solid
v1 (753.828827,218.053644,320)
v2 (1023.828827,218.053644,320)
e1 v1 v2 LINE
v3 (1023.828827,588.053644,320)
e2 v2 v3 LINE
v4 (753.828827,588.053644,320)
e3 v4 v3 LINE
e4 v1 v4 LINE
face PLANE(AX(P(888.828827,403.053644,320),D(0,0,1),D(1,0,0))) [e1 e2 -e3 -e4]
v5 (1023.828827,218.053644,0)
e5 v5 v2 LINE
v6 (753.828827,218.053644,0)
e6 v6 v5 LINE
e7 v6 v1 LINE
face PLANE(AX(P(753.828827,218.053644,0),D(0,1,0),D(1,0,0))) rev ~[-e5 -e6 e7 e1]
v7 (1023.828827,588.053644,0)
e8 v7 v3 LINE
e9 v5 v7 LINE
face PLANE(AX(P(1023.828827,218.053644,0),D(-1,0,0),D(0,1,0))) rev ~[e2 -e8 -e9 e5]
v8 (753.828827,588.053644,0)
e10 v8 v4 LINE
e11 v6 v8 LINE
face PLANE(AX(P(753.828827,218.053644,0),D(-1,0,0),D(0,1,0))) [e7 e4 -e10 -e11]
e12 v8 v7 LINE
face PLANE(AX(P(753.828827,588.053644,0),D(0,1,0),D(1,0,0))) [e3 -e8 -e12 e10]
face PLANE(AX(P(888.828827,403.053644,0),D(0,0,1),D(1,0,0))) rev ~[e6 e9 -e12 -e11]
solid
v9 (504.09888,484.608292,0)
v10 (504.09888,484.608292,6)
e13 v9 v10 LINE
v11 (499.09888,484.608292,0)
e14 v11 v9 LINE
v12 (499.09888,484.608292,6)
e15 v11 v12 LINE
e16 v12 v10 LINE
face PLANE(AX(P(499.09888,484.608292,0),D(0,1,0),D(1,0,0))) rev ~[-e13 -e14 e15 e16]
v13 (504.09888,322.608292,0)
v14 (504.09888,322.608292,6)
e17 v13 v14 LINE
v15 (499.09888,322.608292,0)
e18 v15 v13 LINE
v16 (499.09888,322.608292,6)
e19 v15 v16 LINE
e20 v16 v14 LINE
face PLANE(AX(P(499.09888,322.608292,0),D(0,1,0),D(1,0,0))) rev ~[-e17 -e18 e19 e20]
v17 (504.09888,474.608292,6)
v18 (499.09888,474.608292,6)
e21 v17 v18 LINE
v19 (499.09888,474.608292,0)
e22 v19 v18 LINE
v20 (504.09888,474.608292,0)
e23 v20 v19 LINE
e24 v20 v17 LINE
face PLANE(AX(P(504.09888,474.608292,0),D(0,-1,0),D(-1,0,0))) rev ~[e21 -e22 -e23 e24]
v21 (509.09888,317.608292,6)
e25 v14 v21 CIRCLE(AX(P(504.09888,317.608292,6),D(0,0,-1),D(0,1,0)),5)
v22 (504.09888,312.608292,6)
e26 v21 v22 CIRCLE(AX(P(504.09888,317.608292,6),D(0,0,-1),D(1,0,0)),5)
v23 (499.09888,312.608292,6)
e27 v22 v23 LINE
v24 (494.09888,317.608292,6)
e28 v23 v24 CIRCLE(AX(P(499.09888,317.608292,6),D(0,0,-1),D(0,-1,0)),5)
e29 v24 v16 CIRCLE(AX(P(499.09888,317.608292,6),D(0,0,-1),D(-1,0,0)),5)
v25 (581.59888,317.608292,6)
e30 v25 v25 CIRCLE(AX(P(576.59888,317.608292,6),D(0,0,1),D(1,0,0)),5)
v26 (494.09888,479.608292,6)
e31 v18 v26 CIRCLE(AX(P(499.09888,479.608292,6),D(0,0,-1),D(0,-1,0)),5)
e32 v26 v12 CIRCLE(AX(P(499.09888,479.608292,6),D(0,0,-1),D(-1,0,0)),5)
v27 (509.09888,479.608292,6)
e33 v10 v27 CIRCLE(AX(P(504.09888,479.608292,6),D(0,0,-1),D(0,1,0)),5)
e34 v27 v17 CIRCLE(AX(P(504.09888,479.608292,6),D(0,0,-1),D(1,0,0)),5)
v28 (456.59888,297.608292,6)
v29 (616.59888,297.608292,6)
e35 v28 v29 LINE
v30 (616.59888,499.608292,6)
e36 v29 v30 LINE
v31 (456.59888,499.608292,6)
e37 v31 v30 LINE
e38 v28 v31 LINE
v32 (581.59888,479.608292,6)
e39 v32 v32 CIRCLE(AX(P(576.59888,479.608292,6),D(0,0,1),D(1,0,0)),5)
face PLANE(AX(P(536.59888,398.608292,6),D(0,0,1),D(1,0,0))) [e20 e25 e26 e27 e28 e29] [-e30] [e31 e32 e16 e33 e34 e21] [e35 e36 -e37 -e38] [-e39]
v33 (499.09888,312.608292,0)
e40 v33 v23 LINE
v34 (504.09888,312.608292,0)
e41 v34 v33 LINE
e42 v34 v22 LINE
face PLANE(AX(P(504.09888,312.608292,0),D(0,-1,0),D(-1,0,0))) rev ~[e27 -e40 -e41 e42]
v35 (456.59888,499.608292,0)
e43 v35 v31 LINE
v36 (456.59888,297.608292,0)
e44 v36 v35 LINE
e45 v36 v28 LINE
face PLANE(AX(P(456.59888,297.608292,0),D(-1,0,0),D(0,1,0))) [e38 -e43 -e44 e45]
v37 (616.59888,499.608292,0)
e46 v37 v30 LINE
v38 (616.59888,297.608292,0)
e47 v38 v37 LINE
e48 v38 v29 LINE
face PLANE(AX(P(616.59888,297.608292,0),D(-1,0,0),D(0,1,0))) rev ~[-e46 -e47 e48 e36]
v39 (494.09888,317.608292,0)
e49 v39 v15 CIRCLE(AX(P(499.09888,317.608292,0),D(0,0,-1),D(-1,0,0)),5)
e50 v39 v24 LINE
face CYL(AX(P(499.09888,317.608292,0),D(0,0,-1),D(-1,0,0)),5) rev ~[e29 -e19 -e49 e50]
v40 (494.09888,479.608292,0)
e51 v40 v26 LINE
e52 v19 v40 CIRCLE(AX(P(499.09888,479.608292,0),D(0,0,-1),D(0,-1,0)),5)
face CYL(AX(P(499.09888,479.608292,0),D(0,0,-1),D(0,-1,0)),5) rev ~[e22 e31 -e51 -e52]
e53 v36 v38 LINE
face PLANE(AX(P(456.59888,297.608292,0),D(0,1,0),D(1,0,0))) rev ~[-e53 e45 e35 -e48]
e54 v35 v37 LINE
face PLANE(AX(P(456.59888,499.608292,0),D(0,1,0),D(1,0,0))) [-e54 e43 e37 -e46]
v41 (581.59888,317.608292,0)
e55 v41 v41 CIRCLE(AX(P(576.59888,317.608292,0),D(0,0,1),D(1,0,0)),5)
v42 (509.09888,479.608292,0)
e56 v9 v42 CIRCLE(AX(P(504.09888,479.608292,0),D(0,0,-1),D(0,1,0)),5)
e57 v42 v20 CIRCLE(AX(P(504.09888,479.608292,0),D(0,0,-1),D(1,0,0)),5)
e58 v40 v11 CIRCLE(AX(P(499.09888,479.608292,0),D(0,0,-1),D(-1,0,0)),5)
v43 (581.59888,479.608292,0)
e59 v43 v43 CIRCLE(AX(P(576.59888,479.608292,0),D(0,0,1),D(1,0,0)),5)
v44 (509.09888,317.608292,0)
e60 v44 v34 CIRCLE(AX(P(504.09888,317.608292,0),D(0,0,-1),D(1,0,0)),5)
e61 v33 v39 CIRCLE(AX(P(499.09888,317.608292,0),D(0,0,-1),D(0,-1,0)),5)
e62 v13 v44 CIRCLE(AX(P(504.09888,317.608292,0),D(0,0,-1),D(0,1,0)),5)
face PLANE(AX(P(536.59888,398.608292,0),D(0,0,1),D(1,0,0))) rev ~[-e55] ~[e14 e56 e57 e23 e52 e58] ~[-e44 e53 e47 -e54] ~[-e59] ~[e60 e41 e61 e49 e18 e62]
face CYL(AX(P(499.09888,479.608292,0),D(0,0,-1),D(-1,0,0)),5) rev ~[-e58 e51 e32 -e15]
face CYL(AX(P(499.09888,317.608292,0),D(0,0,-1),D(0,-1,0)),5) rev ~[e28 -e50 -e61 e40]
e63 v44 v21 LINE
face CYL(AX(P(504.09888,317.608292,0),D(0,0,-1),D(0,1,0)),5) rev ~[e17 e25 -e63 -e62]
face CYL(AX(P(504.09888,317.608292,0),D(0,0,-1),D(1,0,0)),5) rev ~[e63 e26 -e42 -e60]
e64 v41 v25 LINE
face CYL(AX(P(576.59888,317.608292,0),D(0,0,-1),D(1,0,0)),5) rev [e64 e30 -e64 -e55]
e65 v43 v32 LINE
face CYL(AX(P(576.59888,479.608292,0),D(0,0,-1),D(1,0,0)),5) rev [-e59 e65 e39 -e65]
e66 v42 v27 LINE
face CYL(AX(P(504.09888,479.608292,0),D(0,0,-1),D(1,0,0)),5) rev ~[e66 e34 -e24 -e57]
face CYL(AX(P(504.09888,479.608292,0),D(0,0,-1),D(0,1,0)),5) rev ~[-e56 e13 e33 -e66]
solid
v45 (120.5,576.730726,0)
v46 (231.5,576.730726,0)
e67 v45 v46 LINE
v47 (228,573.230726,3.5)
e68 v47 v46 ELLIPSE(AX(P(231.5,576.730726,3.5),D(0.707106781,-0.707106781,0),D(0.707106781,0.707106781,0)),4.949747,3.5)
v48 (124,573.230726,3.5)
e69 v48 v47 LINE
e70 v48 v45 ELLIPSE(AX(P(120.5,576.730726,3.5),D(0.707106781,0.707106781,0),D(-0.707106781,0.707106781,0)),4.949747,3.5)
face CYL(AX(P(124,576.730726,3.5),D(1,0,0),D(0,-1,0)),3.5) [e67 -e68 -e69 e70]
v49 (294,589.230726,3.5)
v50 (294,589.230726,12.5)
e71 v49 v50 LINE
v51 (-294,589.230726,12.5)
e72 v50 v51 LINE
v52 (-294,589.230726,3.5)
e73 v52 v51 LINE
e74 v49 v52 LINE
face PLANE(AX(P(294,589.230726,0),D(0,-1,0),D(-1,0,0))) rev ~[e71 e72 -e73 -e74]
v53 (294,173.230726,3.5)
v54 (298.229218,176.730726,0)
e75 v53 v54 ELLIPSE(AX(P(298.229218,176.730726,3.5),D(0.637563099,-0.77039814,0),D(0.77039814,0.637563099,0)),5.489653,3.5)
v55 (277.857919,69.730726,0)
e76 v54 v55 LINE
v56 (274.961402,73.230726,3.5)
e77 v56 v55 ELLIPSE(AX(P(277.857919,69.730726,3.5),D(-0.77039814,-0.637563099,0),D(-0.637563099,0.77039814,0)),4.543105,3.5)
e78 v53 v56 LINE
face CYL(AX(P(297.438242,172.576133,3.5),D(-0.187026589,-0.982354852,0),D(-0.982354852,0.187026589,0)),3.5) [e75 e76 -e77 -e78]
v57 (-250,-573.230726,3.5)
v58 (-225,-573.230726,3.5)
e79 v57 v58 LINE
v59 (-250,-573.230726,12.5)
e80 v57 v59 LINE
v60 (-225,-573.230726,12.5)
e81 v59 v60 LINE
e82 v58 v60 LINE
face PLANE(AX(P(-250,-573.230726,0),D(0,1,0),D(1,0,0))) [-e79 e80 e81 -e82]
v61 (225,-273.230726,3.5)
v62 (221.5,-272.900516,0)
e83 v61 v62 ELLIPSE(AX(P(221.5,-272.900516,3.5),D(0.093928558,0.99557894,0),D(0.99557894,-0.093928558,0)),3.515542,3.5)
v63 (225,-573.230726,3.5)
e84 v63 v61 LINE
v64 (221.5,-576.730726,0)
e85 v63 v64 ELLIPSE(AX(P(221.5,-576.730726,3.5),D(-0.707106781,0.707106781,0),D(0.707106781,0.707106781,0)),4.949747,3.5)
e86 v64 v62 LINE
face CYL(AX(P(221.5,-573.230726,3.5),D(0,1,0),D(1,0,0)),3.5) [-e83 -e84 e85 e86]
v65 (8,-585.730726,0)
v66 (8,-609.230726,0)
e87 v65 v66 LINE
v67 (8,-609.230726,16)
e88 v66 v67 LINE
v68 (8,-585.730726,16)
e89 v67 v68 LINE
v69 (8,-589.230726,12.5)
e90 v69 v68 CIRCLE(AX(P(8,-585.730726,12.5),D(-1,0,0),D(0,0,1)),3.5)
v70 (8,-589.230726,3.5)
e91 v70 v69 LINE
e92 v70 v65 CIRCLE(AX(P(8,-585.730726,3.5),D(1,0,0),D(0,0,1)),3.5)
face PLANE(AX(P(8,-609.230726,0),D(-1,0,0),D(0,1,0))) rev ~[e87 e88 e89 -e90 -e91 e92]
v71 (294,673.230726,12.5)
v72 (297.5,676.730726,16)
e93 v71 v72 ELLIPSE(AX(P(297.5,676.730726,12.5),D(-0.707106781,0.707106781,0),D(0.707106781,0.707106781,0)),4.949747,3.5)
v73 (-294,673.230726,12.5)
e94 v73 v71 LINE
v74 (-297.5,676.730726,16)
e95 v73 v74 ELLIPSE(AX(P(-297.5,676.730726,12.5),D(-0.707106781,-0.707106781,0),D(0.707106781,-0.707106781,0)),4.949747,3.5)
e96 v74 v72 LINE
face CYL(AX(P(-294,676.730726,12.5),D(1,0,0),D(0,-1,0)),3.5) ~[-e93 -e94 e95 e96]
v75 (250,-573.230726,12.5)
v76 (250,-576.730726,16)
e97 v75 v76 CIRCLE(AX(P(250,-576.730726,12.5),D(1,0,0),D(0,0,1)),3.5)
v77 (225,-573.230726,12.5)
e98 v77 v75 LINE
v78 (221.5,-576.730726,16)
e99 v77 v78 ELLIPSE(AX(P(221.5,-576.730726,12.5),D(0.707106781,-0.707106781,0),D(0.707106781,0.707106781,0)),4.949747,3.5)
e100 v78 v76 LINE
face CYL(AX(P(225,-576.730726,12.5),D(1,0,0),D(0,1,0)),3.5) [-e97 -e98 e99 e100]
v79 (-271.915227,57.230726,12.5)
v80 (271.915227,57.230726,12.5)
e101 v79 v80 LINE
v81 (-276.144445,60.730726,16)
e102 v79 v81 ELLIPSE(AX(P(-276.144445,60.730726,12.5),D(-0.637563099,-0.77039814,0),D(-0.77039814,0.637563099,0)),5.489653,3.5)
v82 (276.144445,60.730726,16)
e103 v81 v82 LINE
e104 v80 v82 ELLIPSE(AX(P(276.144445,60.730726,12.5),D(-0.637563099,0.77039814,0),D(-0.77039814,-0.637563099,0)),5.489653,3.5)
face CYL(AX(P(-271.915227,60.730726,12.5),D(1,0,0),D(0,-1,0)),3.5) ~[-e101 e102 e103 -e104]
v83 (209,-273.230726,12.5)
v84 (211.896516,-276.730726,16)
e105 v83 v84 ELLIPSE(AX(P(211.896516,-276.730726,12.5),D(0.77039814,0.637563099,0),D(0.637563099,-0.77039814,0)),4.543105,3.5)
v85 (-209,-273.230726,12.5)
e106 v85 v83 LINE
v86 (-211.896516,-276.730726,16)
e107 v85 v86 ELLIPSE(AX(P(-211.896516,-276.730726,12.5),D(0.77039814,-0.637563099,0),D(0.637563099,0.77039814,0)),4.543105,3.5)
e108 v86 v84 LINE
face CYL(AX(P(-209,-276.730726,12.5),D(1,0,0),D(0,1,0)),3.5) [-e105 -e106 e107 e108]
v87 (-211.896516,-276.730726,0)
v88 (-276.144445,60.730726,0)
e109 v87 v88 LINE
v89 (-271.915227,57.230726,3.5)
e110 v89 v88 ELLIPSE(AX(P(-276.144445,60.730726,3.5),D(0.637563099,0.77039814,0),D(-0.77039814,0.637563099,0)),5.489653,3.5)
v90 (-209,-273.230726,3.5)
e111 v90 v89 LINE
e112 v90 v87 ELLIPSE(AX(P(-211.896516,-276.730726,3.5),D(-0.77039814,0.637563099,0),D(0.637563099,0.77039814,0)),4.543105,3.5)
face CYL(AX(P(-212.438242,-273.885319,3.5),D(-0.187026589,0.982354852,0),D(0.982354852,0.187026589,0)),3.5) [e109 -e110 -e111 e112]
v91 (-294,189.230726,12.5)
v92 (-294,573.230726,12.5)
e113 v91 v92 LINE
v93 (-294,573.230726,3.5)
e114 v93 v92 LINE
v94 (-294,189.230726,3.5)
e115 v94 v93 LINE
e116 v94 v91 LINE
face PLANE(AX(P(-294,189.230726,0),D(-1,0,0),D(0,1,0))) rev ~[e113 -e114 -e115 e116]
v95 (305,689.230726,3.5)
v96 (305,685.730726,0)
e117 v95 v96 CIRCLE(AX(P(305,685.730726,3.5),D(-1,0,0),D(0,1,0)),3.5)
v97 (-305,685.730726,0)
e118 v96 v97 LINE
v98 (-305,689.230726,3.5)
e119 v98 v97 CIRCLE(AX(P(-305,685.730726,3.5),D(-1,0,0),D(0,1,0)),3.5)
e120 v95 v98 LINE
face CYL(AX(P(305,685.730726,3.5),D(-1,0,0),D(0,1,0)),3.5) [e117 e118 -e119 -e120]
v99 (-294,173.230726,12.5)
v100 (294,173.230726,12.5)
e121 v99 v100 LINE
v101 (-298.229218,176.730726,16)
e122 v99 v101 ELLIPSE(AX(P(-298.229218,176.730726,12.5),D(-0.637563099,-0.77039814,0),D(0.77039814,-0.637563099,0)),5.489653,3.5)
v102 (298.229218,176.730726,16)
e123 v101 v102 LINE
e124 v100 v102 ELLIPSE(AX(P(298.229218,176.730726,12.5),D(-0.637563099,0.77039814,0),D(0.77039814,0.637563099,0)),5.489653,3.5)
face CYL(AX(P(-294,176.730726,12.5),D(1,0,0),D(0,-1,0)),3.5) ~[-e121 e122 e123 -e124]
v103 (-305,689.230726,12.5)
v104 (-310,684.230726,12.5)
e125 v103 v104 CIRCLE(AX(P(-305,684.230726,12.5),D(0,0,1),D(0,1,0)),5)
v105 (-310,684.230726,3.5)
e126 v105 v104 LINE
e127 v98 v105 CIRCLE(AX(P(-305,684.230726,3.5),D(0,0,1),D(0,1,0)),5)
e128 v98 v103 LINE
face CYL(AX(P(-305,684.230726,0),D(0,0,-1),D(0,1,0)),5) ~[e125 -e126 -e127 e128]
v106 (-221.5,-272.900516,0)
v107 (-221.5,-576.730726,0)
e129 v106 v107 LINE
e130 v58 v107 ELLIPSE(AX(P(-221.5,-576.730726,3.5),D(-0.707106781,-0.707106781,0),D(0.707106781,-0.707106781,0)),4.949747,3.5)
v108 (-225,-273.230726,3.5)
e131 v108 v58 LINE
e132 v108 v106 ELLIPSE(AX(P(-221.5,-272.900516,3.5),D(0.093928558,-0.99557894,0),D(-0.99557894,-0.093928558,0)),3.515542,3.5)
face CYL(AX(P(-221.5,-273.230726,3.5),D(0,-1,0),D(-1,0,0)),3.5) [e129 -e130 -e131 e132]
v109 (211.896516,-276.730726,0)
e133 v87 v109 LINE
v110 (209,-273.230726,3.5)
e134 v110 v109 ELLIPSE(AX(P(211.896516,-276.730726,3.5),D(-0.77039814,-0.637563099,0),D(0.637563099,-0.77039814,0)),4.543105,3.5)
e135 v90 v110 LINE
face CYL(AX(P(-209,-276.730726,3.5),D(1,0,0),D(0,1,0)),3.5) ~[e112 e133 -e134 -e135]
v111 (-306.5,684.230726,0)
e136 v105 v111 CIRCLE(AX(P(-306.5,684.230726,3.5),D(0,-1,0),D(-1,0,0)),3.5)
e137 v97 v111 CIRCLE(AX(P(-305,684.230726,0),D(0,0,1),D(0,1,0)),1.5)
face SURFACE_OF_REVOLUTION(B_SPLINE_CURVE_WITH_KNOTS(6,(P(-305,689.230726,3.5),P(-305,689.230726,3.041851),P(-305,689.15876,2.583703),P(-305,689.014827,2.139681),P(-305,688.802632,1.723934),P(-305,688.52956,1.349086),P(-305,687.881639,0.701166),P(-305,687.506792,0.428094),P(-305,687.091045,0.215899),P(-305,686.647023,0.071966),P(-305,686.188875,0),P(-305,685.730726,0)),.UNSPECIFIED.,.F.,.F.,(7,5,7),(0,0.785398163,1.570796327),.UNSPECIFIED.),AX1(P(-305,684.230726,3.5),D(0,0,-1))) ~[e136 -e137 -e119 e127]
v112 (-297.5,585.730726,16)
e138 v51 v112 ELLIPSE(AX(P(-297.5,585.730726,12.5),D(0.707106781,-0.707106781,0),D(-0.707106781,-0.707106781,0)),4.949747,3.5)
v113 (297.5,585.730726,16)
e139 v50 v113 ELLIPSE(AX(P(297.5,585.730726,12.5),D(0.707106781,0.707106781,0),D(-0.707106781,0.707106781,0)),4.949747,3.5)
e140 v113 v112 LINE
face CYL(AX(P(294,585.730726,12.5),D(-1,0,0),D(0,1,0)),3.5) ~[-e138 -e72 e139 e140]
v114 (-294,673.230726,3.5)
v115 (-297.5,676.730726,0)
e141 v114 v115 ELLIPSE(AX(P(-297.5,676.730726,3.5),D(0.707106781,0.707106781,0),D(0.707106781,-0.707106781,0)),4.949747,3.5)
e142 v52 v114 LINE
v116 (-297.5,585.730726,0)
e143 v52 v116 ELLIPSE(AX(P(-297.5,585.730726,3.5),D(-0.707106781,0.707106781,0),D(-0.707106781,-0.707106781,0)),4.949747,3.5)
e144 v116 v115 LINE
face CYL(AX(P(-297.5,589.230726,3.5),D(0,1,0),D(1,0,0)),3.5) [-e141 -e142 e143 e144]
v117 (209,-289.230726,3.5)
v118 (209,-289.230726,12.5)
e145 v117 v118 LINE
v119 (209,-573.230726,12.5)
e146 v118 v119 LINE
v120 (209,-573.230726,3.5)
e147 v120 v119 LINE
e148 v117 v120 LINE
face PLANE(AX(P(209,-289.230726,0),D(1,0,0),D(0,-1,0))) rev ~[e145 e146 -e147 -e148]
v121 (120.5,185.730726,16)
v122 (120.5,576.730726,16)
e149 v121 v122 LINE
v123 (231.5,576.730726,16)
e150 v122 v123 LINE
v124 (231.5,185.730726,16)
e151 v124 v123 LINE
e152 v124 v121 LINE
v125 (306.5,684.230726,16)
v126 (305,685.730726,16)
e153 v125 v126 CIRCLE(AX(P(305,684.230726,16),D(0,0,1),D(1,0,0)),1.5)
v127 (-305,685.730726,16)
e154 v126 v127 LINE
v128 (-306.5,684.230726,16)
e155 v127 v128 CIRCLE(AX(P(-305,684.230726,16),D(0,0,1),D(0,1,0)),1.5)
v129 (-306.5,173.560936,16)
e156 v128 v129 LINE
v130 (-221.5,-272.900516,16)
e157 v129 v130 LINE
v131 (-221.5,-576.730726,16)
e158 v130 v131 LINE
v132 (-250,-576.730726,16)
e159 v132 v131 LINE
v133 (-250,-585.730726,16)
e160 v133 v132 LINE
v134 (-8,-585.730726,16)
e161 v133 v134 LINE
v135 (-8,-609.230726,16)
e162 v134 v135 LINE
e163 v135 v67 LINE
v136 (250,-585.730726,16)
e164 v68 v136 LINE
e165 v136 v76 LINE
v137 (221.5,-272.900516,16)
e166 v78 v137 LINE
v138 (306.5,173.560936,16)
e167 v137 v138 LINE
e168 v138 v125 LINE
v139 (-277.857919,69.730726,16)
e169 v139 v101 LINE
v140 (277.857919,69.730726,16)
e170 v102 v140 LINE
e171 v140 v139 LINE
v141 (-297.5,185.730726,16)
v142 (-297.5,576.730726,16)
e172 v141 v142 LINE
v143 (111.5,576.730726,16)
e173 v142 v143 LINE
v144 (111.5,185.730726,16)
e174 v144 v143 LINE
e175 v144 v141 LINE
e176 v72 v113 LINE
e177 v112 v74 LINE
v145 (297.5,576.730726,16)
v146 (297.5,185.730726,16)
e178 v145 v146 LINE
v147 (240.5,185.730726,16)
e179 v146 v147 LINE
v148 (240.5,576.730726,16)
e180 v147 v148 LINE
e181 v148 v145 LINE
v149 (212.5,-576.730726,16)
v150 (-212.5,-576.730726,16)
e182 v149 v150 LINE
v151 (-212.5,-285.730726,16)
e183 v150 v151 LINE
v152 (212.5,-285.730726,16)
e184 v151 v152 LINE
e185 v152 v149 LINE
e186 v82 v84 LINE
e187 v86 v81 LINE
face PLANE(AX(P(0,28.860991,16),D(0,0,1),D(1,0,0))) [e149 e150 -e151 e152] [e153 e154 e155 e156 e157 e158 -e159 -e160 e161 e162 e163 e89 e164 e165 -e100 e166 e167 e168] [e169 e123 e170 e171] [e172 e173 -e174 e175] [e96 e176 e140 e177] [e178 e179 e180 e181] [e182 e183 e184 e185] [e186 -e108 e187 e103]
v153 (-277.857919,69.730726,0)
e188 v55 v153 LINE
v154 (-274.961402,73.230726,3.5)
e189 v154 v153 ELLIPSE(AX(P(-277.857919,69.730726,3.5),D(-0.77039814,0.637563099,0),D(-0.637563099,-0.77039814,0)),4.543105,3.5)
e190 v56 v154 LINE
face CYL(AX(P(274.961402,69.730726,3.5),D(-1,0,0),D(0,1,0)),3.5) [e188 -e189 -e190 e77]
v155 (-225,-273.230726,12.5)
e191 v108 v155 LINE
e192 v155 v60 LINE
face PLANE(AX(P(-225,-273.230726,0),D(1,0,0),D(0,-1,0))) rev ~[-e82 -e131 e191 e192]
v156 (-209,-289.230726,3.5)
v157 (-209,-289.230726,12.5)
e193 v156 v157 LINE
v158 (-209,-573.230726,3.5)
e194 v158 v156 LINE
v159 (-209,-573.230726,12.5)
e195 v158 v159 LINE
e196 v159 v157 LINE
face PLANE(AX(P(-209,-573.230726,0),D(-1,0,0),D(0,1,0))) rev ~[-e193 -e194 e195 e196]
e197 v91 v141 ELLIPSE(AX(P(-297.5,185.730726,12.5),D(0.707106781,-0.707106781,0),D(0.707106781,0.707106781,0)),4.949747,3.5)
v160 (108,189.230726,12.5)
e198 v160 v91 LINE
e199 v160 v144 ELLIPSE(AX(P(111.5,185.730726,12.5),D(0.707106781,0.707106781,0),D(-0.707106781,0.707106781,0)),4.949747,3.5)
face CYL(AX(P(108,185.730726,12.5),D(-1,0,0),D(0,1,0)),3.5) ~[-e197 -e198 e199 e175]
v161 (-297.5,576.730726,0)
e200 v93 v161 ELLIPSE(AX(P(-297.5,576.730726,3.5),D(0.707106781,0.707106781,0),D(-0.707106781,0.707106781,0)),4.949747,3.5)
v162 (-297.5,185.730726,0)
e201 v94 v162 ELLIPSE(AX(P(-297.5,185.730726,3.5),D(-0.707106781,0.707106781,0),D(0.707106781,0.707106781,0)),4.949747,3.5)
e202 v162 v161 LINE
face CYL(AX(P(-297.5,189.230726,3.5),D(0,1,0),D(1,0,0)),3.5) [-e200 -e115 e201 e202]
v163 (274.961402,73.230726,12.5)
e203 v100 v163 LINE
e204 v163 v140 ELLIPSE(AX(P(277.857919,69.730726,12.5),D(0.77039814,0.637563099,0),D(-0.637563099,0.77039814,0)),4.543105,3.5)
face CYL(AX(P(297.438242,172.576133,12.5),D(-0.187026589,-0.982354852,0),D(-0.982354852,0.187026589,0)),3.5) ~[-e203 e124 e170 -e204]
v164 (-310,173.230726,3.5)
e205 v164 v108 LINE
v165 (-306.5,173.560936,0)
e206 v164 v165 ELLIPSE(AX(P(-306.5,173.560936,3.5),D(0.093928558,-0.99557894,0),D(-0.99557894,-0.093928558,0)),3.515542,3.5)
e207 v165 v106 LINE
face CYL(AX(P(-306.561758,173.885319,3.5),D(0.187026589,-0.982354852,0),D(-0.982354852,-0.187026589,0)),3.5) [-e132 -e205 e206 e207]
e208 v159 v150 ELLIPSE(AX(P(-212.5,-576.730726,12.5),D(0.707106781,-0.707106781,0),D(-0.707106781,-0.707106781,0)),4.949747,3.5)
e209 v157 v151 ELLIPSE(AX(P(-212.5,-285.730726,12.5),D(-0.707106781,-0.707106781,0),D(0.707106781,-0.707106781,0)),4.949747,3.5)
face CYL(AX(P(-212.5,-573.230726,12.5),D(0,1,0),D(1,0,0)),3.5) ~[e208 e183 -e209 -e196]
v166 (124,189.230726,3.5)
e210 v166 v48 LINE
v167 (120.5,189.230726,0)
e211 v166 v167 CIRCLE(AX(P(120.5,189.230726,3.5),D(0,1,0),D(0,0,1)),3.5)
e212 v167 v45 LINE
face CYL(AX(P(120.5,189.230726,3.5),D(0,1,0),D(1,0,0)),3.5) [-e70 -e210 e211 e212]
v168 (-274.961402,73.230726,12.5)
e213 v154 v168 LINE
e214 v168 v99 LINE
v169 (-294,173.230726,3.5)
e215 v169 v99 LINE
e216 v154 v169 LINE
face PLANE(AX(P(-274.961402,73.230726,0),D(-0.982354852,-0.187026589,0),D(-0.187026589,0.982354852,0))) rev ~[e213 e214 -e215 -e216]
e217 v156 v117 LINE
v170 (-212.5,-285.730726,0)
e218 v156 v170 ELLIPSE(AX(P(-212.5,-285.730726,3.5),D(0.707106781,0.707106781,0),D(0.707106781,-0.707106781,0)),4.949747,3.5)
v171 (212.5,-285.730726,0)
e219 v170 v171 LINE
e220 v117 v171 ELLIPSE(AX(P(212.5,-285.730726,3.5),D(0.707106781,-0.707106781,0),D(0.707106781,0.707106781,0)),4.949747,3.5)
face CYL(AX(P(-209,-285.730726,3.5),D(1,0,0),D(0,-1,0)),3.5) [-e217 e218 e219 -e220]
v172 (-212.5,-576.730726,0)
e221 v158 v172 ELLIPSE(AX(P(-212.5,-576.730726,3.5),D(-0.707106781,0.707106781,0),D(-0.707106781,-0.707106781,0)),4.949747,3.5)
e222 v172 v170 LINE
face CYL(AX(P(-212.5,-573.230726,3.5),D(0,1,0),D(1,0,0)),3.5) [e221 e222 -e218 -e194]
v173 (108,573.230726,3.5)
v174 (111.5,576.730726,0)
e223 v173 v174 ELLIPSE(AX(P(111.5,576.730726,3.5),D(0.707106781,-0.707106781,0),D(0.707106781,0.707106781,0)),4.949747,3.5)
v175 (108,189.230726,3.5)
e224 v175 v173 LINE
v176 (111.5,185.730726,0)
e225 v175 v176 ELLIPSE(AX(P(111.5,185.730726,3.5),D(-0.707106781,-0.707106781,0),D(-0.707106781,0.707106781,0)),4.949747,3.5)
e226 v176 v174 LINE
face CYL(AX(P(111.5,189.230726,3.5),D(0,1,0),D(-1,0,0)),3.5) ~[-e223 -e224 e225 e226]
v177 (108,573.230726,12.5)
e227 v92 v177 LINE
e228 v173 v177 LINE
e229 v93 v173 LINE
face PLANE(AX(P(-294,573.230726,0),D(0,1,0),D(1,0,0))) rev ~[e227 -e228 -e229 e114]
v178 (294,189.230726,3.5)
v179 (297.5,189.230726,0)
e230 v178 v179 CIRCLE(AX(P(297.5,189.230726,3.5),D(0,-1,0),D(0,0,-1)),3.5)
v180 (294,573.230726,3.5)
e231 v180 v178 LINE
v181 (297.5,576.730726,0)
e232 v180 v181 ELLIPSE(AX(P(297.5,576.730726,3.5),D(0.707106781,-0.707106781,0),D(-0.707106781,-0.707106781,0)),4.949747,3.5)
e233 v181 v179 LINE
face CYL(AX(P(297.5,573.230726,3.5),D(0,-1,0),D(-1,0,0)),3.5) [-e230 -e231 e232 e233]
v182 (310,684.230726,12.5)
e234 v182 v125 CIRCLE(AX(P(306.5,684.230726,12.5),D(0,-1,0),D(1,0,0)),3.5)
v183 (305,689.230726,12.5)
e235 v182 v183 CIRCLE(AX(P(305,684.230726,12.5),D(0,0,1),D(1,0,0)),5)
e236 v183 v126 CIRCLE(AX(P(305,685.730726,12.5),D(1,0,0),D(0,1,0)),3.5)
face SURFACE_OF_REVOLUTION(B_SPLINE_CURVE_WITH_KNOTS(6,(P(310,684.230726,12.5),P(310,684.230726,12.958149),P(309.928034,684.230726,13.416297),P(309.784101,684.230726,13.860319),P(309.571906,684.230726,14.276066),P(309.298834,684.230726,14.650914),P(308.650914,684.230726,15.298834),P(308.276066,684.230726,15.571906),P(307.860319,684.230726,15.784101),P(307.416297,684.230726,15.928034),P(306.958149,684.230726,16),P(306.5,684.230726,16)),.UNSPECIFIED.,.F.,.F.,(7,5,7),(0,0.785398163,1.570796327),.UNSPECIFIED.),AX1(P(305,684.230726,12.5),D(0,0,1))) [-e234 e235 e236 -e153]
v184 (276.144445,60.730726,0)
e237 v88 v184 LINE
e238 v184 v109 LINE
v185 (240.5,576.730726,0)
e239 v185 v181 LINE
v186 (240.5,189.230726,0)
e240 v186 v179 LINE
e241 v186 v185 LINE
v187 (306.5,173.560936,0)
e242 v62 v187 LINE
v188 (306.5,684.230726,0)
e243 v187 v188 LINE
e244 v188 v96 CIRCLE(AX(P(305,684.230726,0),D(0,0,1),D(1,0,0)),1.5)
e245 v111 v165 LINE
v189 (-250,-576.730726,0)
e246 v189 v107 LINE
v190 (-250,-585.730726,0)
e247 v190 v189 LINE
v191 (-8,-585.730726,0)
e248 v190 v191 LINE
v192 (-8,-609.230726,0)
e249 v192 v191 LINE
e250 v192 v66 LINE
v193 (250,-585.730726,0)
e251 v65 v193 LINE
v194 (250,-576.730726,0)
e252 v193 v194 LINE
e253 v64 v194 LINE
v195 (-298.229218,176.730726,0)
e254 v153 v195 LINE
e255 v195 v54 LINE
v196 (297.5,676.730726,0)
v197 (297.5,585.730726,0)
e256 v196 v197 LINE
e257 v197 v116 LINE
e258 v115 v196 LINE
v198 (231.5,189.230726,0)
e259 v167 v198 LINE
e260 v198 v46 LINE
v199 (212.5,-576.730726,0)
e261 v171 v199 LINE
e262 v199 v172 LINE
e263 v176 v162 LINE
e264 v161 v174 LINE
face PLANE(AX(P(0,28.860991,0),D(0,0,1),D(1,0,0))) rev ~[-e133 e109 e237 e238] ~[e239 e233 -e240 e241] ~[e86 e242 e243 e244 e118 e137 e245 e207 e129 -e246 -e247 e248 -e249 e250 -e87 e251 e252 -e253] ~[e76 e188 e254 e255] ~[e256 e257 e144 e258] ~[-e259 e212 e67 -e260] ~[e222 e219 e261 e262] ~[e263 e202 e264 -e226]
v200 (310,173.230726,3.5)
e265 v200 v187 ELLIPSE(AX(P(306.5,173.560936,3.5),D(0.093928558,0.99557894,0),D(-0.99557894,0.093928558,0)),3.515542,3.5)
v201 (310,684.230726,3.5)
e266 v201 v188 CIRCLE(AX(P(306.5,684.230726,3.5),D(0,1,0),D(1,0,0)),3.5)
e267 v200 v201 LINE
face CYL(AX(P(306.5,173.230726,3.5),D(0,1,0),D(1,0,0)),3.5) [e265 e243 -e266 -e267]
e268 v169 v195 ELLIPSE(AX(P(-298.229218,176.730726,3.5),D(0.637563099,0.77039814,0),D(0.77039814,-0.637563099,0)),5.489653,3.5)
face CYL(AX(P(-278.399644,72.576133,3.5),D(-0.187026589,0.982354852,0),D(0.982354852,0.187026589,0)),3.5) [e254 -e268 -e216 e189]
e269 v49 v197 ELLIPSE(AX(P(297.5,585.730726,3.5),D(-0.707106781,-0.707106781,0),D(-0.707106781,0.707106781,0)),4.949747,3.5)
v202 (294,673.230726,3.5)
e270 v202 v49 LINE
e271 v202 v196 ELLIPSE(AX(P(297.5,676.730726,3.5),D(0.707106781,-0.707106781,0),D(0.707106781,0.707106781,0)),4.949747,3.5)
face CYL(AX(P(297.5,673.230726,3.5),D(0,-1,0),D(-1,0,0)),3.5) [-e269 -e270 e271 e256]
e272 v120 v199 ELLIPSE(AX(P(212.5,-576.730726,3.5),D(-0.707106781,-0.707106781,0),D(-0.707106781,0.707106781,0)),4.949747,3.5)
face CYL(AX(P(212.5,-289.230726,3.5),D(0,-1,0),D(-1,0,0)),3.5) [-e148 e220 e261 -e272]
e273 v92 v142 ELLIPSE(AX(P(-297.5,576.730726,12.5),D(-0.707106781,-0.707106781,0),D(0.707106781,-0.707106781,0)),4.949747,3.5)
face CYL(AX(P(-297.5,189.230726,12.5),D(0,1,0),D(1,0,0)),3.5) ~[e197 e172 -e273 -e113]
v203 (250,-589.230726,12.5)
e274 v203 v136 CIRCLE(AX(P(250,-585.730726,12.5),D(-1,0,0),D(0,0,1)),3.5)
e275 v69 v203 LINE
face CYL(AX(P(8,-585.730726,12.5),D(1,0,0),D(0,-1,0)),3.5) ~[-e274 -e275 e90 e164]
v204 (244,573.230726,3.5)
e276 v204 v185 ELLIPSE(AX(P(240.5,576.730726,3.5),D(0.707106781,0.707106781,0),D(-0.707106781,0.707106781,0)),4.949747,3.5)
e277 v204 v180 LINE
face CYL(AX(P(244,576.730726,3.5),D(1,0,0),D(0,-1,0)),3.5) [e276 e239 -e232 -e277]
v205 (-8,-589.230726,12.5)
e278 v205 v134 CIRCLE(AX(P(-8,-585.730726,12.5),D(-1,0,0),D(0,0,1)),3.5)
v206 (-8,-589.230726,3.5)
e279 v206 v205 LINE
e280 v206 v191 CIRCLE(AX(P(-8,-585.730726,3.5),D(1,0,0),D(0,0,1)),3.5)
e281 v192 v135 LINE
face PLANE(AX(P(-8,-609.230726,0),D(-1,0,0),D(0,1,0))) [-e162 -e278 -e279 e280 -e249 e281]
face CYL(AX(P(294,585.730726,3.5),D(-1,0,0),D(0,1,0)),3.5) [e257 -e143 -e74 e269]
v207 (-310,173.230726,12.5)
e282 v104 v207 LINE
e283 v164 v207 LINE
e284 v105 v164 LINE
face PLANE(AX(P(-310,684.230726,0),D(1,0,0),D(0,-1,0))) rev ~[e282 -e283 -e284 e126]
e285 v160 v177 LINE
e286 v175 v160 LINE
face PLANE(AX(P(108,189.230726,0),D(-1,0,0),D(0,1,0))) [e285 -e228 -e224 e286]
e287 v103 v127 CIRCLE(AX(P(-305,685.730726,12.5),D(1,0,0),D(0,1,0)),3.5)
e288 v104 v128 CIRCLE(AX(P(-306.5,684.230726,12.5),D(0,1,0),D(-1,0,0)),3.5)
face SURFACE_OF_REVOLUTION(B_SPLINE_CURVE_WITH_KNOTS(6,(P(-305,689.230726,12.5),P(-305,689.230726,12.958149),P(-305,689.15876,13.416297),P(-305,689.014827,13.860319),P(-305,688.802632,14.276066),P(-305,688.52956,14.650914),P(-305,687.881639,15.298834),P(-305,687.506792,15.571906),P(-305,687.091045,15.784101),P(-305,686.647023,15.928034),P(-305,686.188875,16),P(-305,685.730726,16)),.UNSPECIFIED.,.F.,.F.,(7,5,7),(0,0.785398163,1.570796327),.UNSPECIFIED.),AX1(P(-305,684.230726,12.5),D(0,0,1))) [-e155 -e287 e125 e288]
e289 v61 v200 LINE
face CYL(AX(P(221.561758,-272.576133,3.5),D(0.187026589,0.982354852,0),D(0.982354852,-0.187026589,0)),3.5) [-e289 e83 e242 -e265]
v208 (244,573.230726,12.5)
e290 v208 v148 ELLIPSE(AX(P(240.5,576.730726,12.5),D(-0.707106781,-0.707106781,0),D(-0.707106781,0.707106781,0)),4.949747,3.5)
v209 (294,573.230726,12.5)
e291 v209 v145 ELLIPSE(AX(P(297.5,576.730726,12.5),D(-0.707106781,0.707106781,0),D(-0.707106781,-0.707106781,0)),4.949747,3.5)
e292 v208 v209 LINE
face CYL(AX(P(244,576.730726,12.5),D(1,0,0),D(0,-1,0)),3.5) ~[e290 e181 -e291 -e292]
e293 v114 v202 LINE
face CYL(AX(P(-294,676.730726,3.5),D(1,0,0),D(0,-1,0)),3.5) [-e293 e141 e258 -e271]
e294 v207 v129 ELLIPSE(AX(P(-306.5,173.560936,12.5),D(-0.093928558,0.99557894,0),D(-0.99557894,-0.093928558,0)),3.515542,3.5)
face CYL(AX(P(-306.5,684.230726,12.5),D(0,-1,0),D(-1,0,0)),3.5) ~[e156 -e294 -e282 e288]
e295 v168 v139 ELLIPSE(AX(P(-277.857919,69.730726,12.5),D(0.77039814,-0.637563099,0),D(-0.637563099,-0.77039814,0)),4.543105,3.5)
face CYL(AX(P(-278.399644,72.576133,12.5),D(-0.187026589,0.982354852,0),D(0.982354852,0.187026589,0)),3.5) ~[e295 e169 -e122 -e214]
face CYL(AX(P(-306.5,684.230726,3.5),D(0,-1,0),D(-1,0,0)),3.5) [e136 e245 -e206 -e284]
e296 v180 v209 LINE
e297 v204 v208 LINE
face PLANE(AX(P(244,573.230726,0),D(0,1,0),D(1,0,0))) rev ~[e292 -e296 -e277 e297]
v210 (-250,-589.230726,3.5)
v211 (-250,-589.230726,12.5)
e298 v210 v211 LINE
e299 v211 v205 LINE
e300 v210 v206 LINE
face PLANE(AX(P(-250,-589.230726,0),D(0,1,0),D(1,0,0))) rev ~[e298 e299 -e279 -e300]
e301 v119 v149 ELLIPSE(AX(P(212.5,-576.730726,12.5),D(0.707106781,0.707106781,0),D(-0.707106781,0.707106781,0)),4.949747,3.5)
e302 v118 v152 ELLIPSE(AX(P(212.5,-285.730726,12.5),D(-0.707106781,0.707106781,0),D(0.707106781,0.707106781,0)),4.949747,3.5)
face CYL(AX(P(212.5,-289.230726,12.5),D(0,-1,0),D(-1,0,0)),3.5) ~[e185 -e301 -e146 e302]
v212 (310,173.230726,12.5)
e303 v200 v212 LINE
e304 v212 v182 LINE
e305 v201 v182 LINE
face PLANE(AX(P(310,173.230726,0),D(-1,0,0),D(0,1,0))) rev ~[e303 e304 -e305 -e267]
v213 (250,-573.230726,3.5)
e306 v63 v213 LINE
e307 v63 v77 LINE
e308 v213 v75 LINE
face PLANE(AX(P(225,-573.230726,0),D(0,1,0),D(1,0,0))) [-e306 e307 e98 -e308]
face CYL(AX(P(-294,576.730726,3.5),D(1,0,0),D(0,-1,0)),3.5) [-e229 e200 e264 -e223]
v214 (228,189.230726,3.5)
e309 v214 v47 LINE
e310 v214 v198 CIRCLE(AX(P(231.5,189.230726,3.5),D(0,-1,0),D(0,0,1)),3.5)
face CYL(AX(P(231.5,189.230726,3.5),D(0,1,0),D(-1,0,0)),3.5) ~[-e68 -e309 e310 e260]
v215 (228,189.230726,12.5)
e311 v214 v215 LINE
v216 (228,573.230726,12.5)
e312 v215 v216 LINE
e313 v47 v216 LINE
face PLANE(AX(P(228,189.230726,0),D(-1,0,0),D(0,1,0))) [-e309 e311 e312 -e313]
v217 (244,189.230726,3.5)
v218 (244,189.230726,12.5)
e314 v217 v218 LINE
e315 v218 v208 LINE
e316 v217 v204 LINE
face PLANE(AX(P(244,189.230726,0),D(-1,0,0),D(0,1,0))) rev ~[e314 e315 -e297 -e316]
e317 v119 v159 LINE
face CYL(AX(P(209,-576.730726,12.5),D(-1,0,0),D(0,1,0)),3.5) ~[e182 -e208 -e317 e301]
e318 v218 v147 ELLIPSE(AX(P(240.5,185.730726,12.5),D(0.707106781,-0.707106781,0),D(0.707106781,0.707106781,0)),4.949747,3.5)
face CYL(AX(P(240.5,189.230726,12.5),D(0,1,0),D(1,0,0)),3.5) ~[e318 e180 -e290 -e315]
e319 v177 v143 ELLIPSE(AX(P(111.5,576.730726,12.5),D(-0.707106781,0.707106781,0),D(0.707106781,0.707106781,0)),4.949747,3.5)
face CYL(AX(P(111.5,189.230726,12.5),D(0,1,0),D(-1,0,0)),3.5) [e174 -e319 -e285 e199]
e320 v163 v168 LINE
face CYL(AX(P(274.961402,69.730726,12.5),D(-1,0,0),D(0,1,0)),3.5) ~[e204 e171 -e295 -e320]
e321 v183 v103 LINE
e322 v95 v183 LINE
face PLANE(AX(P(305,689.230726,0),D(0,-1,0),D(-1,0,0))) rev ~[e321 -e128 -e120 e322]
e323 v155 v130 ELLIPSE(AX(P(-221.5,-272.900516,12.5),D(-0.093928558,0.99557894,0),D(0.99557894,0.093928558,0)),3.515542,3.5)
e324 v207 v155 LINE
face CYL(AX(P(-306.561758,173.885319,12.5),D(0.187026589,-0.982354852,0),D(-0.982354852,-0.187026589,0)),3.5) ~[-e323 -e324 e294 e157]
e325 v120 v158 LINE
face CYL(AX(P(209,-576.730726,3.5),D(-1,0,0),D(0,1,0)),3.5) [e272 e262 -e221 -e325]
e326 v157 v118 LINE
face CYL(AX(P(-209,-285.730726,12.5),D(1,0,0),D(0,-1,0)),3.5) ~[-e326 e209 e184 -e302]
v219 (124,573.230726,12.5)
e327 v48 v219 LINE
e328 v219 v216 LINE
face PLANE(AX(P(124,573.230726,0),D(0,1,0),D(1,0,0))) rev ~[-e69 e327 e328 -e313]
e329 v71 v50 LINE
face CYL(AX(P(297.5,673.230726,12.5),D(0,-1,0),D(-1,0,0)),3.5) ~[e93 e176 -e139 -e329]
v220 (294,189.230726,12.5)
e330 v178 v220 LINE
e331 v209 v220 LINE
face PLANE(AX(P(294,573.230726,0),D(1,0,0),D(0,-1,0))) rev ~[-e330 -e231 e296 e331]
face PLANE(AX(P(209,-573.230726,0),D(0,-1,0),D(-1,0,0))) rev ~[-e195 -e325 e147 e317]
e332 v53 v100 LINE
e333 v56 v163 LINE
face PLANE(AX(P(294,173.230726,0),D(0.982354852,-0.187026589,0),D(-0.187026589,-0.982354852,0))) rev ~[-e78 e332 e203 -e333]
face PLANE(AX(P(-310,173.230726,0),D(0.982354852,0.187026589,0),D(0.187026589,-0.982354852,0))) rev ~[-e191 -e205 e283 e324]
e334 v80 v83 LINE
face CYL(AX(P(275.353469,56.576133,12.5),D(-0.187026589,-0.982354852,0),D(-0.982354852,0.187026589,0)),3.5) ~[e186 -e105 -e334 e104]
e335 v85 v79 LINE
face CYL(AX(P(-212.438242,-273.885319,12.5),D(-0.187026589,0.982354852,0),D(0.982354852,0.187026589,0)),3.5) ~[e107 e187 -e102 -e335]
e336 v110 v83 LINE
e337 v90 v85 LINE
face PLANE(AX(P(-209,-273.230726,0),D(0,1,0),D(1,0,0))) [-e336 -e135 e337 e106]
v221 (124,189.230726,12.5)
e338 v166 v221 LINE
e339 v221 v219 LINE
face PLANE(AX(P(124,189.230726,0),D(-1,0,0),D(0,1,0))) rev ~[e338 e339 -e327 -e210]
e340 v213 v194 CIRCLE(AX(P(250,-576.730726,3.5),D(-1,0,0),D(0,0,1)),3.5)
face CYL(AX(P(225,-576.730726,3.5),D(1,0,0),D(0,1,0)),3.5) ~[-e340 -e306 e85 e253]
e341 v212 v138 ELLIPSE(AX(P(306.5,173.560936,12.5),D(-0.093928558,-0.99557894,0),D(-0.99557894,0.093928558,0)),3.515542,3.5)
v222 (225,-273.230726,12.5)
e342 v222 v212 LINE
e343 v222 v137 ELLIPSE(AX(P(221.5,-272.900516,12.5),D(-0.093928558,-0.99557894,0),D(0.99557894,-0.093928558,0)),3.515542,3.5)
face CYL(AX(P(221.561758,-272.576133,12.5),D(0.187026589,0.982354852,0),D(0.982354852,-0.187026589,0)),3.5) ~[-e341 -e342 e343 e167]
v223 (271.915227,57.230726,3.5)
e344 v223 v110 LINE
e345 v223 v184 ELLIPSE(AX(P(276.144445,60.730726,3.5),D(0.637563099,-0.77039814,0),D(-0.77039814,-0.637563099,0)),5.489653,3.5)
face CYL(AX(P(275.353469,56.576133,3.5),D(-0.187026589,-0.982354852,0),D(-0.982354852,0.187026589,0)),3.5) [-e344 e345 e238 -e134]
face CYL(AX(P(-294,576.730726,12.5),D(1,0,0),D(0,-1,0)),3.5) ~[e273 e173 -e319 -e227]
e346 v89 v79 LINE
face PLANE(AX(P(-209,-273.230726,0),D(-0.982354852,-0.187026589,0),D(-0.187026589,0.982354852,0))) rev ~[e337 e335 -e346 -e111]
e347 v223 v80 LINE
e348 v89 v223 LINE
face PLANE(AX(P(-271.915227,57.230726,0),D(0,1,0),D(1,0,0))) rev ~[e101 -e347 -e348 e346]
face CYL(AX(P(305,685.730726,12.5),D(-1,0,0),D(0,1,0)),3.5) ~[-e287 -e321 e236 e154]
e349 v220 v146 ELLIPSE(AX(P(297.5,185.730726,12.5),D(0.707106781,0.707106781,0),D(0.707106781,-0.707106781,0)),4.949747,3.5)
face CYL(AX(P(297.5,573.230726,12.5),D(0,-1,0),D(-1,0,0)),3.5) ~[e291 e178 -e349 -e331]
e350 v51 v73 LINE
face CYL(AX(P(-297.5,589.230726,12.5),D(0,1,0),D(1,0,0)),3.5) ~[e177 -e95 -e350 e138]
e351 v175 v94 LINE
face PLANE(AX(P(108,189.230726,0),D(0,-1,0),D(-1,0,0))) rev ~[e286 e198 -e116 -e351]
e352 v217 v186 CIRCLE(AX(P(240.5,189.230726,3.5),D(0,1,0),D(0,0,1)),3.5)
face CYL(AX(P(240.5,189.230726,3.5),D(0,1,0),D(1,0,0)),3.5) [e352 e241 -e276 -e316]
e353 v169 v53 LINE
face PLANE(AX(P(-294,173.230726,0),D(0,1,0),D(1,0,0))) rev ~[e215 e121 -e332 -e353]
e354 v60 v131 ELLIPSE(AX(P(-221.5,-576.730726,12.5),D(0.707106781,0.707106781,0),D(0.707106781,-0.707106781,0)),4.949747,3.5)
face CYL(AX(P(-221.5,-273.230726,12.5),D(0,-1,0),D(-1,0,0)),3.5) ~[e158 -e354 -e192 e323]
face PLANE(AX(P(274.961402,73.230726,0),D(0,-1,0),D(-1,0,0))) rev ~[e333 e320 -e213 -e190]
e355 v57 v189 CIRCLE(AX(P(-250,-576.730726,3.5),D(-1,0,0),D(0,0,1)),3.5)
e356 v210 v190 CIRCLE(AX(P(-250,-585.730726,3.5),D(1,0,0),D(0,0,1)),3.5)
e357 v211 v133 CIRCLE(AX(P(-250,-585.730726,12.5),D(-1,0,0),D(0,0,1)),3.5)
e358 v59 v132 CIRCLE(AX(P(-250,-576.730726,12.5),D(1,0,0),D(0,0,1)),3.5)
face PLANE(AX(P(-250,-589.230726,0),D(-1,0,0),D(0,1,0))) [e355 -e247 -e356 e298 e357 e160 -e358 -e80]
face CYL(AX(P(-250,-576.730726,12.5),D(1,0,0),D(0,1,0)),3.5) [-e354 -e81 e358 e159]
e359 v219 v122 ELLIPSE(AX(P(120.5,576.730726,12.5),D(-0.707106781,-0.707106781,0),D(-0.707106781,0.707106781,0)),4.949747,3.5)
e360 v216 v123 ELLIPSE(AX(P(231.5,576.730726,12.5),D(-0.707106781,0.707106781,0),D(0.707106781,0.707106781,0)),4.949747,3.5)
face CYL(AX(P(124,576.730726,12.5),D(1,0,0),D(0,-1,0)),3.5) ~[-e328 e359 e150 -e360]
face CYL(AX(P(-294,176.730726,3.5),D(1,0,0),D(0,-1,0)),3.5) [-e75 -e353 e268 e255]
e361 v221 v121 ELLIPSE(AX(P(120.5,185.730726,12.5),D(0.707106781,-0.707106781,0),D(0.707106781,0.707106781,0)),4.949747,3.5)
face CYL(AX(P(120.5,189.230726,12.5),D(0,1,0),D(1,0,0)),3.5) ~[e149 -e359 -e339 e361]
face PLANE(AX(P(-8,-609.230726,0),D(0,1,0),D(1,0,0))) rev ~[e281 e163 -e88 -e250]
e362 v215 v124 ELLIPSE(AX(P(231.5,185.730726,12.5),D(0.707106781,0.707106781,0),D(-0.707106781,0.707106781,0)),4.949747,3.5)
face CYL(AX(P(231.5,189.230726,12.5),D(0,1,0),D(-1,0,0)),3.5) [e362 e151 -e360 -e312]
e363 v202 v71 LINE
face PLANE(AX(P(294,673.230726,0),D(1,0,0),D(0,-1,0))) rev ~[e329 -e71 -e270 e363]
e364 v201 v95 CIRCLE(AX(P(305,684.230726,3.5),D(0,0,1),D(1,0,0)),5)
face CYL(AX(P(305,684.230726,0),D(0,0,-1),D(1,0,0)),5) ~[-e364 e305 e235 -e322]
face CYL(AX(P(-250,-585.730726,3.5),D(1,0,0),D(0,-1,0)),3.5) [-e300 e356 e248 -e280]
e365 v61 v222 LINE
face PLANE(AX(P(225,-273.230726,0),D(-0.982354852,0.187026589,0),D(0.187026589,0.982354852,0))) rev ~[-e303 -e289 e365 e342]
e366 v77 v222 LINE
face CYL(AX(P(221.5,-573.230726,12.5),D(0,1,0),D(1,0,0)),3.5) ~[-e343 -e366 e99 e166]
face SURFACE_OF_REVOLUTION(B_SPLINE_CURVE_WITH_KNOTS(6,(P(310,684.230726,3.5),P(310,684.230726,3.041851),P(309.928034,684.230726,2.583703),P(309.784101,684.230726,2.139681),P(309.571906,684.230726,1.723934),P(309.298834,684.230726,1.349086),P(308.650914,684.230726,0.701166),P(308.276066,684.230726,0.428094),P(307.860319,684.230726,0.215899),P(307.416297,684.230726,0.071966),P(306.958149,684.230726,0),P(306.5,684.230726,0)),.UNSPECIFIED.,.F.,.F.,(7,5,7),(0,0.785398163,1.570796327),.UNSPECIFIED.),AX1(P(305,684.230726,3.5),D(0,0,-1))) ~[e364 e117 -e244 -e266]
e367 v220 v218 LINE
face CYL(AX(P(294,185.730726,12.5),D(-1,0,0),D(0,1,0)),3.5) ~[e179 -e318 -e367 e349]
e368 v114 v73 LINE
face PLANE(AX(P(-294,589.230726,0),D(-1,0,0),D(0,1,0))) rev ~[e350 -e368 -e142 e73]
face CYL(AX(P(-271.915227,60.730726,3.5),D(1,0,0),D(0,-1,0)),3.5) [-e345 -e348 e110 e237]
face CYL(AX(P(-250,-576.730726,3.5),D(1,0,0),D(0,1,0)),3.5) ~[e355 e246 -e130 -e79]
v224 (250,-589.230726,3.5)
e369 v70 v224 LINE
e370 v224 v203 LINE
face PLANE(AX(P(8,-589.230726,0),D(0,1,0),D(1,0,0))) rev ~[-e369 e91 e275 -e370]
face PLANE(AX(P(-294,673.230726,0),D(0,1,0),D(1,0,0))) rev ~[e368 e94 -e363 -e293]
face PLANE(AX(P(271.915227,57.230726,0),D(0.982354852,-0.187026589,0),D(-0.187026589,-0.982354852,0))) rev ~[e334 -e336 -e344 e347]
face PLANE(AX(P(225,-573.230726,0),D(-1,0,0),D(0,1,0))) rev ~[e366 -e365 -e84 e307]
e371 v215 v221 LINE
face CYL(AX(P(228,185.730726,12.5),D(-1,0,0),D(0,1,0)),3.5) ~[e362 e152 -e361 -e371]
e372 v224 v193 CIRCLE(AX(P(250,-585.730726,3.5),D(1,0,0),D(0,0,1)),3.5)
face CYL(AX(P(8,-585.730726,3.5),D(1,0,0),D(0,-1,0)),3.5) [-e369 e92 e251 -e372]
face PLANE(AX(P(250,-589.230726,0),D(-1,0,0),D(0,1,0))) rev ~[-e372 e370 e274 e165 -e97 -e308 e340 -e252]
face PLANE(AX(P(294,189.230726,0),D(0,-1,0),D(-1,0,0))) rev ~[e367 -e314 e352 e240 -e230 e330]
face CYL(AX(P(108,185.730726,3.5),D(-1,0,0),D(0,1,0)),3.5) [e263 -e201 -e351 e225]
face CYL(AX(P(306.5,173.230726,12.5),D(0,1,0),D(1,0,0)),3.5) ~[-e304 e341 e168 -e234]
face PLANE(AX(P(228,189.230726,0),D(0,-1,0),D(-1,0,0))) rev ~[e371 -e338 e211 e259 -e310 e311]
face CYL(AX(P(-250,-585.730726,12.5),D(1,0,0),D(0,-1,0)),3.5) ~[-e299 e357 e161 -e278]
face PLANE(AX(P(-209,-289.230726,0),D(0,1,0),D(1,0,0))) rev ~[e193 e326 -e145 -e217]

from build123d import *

# Parameters (mm, degrees)
F0_W     = 25
F0_H     = 16
F0_W_2   = 16
F0_H_2   = 20
F0_H_3   = 384
F0_W_3   = 418
F1_DEPTH = 16
F2_R     = 3.5
F3_W     = 270
F3_H     = 370
F4_DEPTH = 320
F5_W     = 160
F5_H     = 202
F5_R     = 5
F6_DEPTH = 6


# Not quite as in the source:
# - a feature names something its author has since deleted; it is built from what else it names


with BuildPart() as f1:
    # F0 (on Top) → F1 (new body)
    with BuildSketch(Plane.XY):
        Polygon((209, -589.2307258319), (225, -589.2307258319), (225, -573.2307258319), (225, -273.2307258319), (310, 173.2307258319), (310, 589.2307258319), (294, 589.2307258319), (-294, 589.2307258319), (-310, 589.2307258319), (-310, 173.2307258319), (-225, -273.2307258319), (-225, -573.2307258319), (-225, -589.2307258319), (-209, -589.2307258319), (-8, -589.2307258319), (8, -589.2307258319), align=None)
        Polygon((244, 573.2307258319), (294, 573.2307258319), (294, 189.2307258319), (294, 173.2307258319), (274.9614022256, 73.2307258319), (271.9152265817, 57.2307258319), (209, -273.2307258319), (209, -289.2307258319), (209, -573.2307258319), (-209, -573.2307258319), (-209, -289.2307258319), (-209, -273.2307258319), (-271.9152265817, 57.2307258319), (-274.9614022256, 73.2307258319), (-294, 173.2307258319), (-294, 189.2307258319), (-294, 573.2307258319), (108, 573.2307258319), (124, 573.2307258319), (228, 573.2307258319), align=None, mode=Mode.SUBTRACT)
        with Locations((237.5, -581.2307258319)):
            Rectangle(F0_W, F0_H)
        with Locations((0, -599.2307258319)):
            Rectangle(F0_W_2, F0_H_2)
        with BuildLine():
            Line((294, 589.2307258319), (310, 589.2307258319))
            Line((310, 589.2307258319), (310, 684.2307258319))
            ThreePointArc((310, 684.2307258319), (308.5355339059, 687.7662597378), (305, 689.2307258319))
            Line((305, 689.2307258319), (-305, 689.2307258319))
            ThreePointArc((-305, 689.2307258319), (-308.5355339059, 687.7662597378), (-310, 684.2307258319))
            Line((-310, 684.2307258319), (-310, 589.2307258319))
            Line((-310, 589.2307258319), (-294, 589.2307258319))
            Line((-294, 589.2307258319), (-294, 673.2307258319))
            Line((-294, 673.2307258319), (294, 673.2307258319))
            Line((294, 673.2307258319), (294, 589.2307258319))
        make_face()
        with Locations((-237.5, -581.2307258319)):
            Rectangle(F0_W, F0_H)
        with Locations((236, 381.2307258319)):
            Rectangle(F0_W_2, F0_H_3)
        Polygon((294, 173.2307258319), (294, 189.2307258319), (244, 189.2307258319), (228, 189.2307258319), (124, 189.2307258319), (108, 189.2307258319), (-294, 189.2307258319), (-294, 173.2307258319), align=None)
        with Locations((116, 381.2307258319)):
            Rectangle(F0_W_2, F0_H_3)
        Polygon((271.9152265817, 57.2307258319), (274.9614022256, 73.2307258319), (-274.9614022256, 73.2307258319), (-271.9152265817, 57.2307258319), align=None)
        with Locations((0, -281.2307258319)):
            Rectangle(F0_W_3, F0_H)
    extrude(amount=F1_DEPTH)

    # F2
    f2_edges = [f1.edges().sort_by_distance(p)[0] for p in [
        (0, -573.230726, 16),
        (-93, 573.230726, 16),
        (0, 589.230726, 16),
        (0, 673.230726, 16),
        (0, 689.230726, 16),
        (310, 428.730726, 16),
        (294, 631.230726, 16),
        (-294, 631.230726, 16),
        (-310, 428.730726, 16),
        (0, 689.230726, 0),
        (0, -573.230726, 0),
        (0, 673.230726, 0),
        (-294, 381.230726, 16),
        (294, 381.230726, 16),
        (-240.457613, -108, 16),
        (240.457613, -108, 16),
        (0, -273.230726, 16),
        (0, -289.230726, 16),
        (-267.5, -50, 16),
        (-209, -431.230726, 16),
        (209, -431.230726, 16),
        (267.5, -50, 16),
        (0, -289.230726, 0),
        (0, -273.230726, 0),
        (240.457613, -108, 0),
        (267.5, -50, 0),
        (-240.457613, -108, 0),
        (-225, -423.230726, 0),
        (-267.5, -50, 0),
        (294, 381.230726, 0),
        (-294, 381.230726, 0),
        (-93, 573.230726, 0),
        (0, 589.230726, 0),
        (294, 631.230726, 0),
        (310, 428.730726, 0),
        (-294, 631.230726, 0),
        (209, -431.230726, 0),
        (0, 173.230726, 16),
        (-93, 189.230726, 16),
        (108, 381.230726, 16),
        (124, 381.230726, 16),
        (228, 381.230726, 16),
        (244, 381.230726, 16),
        (108, 381.230726, 0),
        (228, 381.230726, 0),
        (244, 381.230726, 0),
        (124, 381.230726, 0),
        (0, 73.230726, 16),
        (0, 57.230726, 16),
        (0, 73.230726, 0),
        (0, 57.230726, 0),
        (0, 173.230726, 0),
        (-93, 189.230726, 0),
        (-237.5, -573.230726, 16),
        (-129, -589.230726, 0),
        (-237.5, -573.230726, 0),
        (-129, -589.230726, 16),
        (237.5, -573.230726, 16),
        (129, -589.230726, 16),
        (129, -589.230726, 0),
        (237.5, -573.230726, 0),
        (225, -423.230726, 0),
        (225, -423.230726, 16),
        (-225, -423.230726, 16),
        (-209, -431.230726, 0),
        (308.535534, 687.76626, 0),
        (308.535534, 687.76626, 16),
        (-308.535534, 687.76626, 0),
        (-308.535534, 687.76626, 16),
        (-310, 428.730726, 0),
        (-284.480701, 123.230726, 0),
        (-284.480701, 123.230726, 16),
        (284.480701, 123.230726, 0),
        (284.480701, 123.230726, 16),
        (176, 573.230726, 0),
        (176, 573.230726, 16),
        (176, 189.230726, 16),
        (269, 573.230726, 0),
        (269, 573.230726, 16),
        (269, 189.230726, 16),
    ]]
    fillet(f2_edges, radius=F2_R)


with BuildPart() as f4:
    # F3 (on Top) → F4 (new body)
    with BuildSketch(Plane.XY):
        with Locations((888.8288272917, 403.0536437035)):
            Rectangle(F3_W, F3_H)
    extrude(amount=F4_DEPTH)


with BuildPart() as f6:
    # F5 (on Top) → F6 (new body)
    with BuildSketch(Plane.XY):
        with Locations((536.598880291, 398.6082916385)):
            Rectangle(F5_W, F5_H)
        with BuildLine():
            ThreePointArc((494.098880291, 317.6082916385), (495.5633463851, 321.1438255445), (499.098880291, 322.6082916385))
            Line((499.098880291, 322.6082916385), (504.098880291, 322.6082916385))
            ThreePointArc((504.098880291, 322.6082916385), (507.6344141969, 321.1438255445), (509.098880291, 317.6082916385))
            ThreePointArc((509.098880291, 317.6082916385), (507.6344141969, 314.0727577326), (504.098880291, 312.6082916385))
            Line((504.098880291, 312.6082916385), (499.098880291, 312.6082916385))
            ThreePointArc((499.098880291, 312.6082916385), (495.5633463851, 314.0727577326), (494.098880291, 317.6082916385))
        make_face(mode=Mode.SUBTRACT)
        with Locations((576.598880291, 317.6082916385)):
            Circle(F5_R, mode=Mode.SUBTRACT)
        with BuildLine():
            ThreePointArc((494.098880291, 479.6082916385), (495.5633463851, 483.1438255445), (499.098880291, 484.6082916385))
            Line((499.098880291, 484.6082916385), (504.098880291, 484.6082916385))
            ThreePointArc((504.098880291, 484.6082916385), (507.6344141969, 483.1438255445), (509.098880291, 479.6082916385))
            ThreePointArc((509.098880291, 479.6082916385), (507.6344141969, 476.0727577326), (504.098880291, 474.6082916385))
            Line((504.098880291, 474.6082916385), (499.098880291, 474.6082916385))
            ThreePointArc((499.098880291, 474.6082916385), (495.5633463851, 476.0727577326), (494.098880291, 479.6082916385))
        make_face(mode=Mode.SUBTRACT)
        with Locations((576.598880291, 479.6082916385)):
            Circle(F5_R, mode=Mode.SUBTRACT)
    extrude(amount=F6_DEPTH)


solid = Compound([f1.part, f4.part, f6.part])
